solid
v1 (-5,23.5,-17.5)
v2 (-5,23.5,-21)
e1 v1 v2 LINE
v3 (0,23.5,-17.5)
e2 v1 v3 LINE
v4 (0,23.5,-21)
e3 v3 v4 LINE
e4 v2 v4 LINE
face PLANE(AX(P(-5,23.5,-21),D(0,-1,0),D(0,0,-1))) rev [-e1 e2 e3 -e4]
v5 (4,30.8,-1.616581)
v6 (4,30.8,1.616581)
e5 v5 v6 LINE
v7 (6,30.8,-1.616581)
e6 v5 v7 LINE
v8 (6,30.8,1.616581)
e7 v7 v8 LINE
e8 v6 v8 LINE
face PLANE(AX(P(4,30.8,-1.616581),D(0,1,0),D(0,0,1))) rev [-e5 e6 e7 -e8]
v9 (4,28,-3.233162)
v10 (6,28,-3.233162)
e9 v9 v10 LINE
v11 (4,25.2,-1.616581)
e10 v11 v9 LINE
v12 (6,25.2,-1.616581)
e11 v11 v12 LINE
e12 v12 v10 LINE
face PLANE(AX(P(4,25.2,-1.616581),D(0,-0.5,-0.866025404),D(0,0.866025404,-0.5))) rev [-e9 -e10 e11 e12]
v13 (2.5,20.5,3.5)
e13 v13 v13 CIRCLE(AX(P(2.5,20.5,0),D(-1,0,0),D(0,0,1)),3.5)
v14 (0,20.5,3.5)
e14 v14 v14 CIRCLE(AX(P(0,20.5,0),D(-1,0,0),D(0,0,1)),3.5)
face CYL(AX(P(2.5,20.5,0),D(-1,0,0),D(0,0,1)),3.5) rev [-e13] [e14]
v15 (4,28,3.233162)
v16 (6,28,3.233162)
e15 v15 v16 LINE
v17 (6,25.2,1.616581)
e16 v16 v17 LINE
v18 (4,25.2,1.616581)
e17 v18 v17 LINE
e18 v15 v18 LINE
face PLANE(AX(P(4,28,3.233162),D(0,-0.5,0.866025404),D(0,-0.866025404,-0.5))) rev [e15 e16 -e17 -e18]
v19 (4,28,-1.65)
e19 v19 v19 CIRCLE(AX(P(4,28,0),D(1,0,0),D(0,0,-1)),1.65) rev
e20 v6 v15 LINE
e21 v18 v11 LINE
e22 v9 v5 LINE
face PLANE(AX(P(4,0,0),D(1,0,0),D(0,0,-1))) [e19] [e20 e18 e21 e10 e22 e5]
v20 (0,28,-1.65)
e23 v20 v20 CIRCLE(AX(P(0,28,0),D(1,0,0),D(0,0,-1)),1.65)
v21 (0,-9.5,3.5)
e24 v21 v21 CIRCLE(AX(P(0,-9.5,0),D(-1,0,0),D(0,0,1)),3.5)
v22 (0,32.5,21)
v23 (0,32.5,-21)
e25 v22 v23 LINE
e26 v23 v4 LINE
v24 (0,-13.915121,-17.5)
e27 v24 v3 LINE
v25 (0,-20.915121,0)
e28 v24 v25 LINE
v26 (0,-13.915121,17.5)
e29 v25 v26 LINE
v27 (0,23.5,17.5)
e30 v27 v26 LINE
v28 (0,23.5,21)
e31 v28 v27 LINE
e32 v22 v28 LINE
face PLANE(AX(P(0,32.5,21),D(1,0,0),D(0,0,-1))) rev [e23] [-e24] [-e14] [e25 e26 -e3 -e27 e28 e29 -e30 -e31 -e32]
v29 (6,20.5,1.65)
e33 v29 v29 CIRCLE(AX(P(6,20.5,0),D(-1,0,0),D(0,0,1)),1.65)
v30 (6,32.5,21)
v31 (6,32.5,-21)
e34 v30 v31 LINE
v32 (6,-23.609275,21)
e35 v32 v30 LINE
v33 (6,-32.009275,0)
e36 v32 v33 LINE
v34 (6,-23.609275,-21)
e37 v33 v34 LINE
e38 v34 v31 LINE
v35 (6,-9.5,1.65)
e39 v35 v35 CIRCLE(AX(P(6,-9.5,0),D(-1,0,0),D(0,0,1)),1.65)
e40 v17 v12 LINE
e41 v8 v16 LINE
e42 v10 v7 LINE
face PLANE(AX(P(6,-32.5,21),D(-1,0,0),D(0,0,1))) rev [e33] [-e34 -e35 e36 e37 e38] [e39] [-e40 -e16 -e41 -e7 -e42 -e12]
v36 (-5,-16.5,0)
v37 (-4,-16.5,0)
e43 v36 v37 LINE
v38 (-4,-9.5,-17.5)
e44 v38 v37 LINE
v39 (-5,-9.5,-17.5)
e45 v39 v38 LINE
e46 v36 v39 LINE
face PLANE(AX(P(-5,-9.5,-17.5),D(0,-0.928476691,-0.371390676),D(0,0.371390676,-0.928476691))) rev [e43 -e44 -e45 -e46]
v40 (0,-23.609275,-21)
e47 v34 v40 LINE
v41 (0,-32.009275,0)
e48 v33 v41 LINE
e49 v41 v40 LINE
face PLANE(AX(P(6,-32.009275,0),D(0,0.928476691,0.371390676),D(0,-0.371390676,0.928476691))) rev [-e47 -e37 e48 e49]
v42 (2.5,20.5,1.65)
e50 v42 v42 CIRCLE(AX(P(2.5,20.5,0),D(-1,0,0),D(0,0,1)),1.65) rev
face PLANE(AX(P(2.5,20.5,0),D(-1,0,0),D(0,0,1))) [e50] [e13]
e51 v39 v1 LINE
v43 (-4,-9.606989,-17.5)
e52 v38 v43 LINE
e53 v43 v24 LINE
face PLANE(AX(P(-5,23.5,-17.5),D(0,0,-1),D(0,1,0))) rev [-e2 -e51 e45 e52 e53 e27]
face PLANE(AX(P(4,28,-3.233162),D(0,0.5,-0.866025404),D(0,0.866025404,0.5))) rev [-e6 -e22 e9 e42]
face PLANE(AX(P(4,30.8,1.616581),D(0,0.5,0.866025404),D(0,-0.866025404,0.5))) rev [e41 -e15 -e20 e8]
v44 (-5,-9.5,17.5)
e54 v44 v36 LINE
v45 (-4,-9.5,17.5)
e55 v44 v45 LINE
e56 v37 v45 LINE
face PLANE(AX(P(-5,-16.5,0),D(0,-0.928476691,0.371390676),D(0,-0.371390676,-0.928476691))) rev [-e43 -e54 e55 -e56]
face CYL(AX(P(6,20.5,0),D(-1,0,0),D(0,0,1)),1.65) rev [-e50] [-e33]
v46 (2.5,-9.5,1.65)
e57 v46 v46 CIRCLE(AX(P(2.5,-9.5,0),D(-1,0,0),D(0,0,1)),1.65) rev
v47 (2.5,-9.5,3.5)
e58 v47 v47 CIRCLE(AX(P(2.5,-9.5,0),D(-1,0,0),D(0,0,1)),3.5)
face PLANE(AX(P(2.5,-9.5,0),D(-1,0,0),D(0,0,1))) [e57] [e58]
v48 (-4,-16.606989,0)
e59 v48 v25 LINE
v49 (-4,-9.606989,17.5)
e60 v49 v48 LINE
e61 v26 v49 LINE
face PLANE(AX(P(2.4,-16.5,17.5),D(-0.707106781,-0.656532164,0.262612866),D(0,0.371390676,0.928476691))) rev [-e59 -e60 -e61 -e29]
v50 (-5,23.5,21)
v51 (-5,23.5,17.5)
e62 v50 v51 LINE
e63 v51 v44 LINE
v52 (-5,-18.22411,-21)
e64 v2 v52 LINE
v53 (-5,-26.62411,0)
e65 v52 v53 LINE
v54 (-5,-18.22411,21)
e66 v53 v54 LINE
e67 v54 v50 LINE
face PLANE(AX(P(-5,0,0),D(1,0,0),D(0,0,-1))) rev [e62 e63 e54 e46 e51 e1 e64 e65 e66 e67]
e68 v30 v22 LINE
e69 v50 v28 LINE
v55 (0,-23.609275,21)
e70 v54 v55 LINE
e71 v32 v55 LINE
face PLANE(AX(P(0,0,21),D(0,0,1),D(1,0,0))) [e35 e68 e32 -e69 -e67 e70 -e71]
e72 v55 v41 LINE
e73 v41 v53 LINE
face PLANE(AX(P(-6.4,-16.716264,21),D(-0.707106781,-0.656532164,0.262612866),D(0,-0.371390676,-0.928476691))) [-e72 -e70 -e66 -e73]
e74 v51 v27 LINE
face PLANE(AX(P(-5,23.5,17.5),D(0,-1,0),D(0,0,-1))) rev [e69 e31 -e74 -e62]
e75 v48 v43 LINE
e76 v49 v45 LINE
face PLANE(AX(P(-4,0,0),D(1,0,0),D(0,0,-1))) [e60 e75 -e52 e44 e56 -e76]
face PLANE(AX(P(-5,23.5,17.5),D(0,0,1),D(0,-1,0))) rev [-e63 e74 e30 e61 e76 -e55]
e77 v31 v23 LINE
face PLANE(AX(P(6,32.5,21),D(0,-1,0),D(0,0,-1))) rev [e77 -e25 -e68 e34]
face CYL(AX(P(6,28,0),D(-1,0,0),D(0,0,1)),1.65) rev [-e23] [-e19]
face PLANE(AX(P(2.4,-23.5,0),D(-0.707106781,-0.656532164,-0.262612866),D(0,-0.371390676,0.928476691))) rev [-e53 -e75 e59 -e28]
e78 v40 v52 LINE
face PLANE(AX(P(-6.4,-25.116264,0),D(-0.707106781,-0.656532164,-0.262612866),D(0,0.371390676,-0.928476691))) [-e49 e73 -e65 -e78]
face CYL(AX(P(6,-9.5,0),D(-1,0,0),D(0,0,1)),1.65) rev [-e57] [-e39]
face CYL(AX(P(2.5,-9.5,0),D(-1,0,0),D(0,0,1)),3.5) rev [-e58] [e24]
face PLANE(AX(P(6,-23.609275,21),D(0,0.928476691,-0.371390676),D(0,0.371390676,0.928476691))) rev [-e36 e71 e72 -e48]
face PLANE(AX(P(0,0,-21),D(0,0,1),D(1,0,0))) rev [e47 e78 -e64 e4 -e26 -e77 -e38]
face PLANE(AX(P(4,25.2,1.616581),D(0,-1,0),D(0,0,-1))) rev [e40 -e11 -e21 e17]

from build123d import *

# Parameters (mm, degrees)
ESBO_O1_W                = 6
ESBO_O1_H                = 65
RESSALTO_EXTRUS_O1_DEPTH = 21
RESSALTO_EXTRUS_O4_DEPTH = 5
CORTE_EXTRUS_O6_START    = -1
CORTE_EXTRUS_O6_DEPTH    = 4
CHANFRO1_SIZE            = 6.4
CHANFRO2_SIZE            = 6.4
ESBO_O15_R               = 1.65
CORTE_EXTRUS_O7_DEPTH    = 41.227478171
CORTE_EXTRUS_O8_DEPTH    = 2
ESBO_O17_R               = 3.5
CORTE_EXTRUS_O9_DEPTH    = 2.5
CORTE_EXTRUS_O10_DEPTH   = 40.15673633


with BuildPart() as part:
    # Esboço1 → Ressalto-extrusão1 (new, symmetric)
    with BuildSketch(Plane.XY):
        with Locations((3, 0)):
            Rectangle(ESBO_O1_W, ESBO_O1_H)
    extrude(amount=RESSALTO_EXTRUS_O1_DEPTH, both=True)

    # Esboço11 → Ressalto-extrusão4 (add)
    with BuildSketch(Plane.ZY):
        Polygon((-17.5, -9.5), (0, -16.5), (17.5, -9.5), (17.5, 23.5), (21, 23.5), (21, -16.716263691), (0, -25.116263691), (-21, -16.716263691), (-21, 23.5), (-17.5, 23.5), align=None)
    extrude(amount=RESSALTO_EXTRUS_O4_DEPTH)

    # Esboço12 → Corte-extrusão6 (cut)
    with BuildSketch(Plane.ZY.offset(5).offset(CORTE_EXTRUS_O6_START)):
        Polygon((-17.5, -9.5), (17.5, -9.5), (17.5, -16.5), (0, -23.5), (-17.5, -16.5), align=None)
    extrude(amount=-CORTE_EXTRUS_O6_DEPTH, mode=Mode.SUBTRACT)

    # Chanfro1
    # the kernel refuses this chamfer: 6.4 mm, written as the material it adds along each edge
    with BuildSketch(Plane(origin=(-4, -29.612634139, 15.281585348), x_dir=(-0.0274958766105864, 0.9281256495501803, 0.3712502598200724), z_dir=(0, 0.371390676354104, -0.9284766908852593))) as chanfro1_piece_1_section:
        Polygon((CHANFRO1_SIZE * 0.999621916911, CHANFRO1_SIZE * 0.0274958766106), (-CHANFRO1_SIZE * 0.0274958766106, CHANFRO1_SIZE * 0.999621916911), (0, 0), align=None)
    chanfro1_piece_1 = extrude(amount=51.765619071, mode=Mode.PRIVATE)
    chanfro1_piece_1 = split(chanfro1_piece_1, bisect_by=Plane(origin=(-1.981352532, -18.155988855, -17.5), z_dir=(0, 0, 1)), keep=Keep.TOP, mode=Mode.PRIVATE)
    chanfro1_piece_1 = split(chanfro1_piece_1, bisect_by=Plane(origin=(-1.981352532, -25.250248134, -4.375620334), z_dir=(0, 0.9284766908852594, -0.3713906763541037)), keep=Keep.TOP, mode=Mode.PRIVATE)
    add(chanfro1_piece_1)
    with BuildSketch(Plane(origin=(-4, -10.387365861, 32.781585348), x_dir=(-0.027495876610586396, 0.9281256495501804, -0.37125025982007215), z_dir=(0, -0.3713906763541037, -0.9284766908852594))) as chanfro1_piece_2_section:
        Polygon((CHANFRO1_SIZE * 0.999621916911, CHANFRO1_SIZE * 0.0274958766106), (-CHANFRO1_SIZE * 0.0274958766106, CHANFRO1_SIZE * 0.999621916911), (0, 0), align=None)
    chanfro1_piece_2 = extrude(amount=51.765619071, mode=Mode.PRIVATE)
    chanfro1_piece_2 = split(chanfro1_piece_2, bisect_by=Plane(origin=(-1.981352532, -18.155988855, 17.5), z_dir=(0, 0, -1)), keep=Keep.TOP, mode=Mode.PRIVATE)
    chanfro1_piece_2 = split(chanfro1_piece_2, bisect_by=Plane(origin=(-1.981352532, -25.250248134, 4.375620334), z_dir=(0, 0.9284766908852593, 0.371390676354104)), keep=Keep.TOP, mode=Mode.PRIVATE)
    add(chanfro1_piece_2)

    # Chanfro2
    # the kernel refuses this chamfer: 6.4 mm, written as the material it adds along each edge
    with BuildSketch(Plane(origin=(0, -31.228897831, 15.281585348), x_dir=(-0.9996219169112968, 0.025529280528386766, 0.010211712211354711), z_dir=(0, 0.37139067635410383, -0.9284766908852593))) as chanfro2_piece_1_section:
        Polygon((CHANFRO2_SIZE * 0.999621916911, -CHANFRO2_SIZE * 0.0274958766106), (-CHANFRO2_SIZE * 0.0274958766106, -CHANFRO2_SIZE * 0.999621916911), (0, 0), align=None)
    chanfro2_piece_1 = extrude(amount=55.535234436, mode=Mode.PRIVATE)
    chanfro2_piece_1 = split(chanfro2_piece_1, bisect_by=Plane(origin=(-5, -22.562055234, -11.871492952), z_dir=(1, 0, 0)), keep=Keep.TOP, mode=Mode.PRIVATE)
    chanfro2_piece_1 = split(chanfro2_piece_1, bisect_by=Plane(origin=(-1.967131821, -22.562055234, -21), z_dir=(0, 0, 1)), keep=Keep.TOP, mode=Mode.PRIVATE)
    chanfro2_piece_1 = split(chanfro2_piece_1, bisect_by=Plane(origin=(-1.967131821, -28.857577336, -9.353284111), z_dir=(0, 0.9284766908852593, -0.37139067635410383)), keep=Keep.TOP, mode=Mode.PRIVATE)
    add(chanfro2_piece_1)
    with BuildSketch(Plane(origin=(0, -10.603629552, 36.281585348), x_dir=(-0.9996219169112968, 0.02552928052838644, -0.010211712211354581), z_dir=(0, -0.37139067635410383, -0.9284766908852593))) as chanfro2_piece_2_section:
        Polygon((CHANFRO2_SIZE * 0.999621916911, -CHANFRO2_SIZE * 0.0274958766106), (-CHANFRO2_SIZE * 0.0274958766106, -CHANFRO2_SIZE * 0.999621916911), (0, 0), align=None)
    chanfro2_piece_2 = extrude(amount=55.535234436, mode=Mode.PRIVATE)
    chanfro2_piece_2 = split(chanfro2_piece_2, bisect_by=Plane(origin=(-5, -22.562055234, 11.871492952), z_dir=(1, 0, 0)), keep=Keep.TOP, mode=Mode.PRIVATE)
    chanfro2_piece_2 = split(chanfro2_piece_2, bisect_by=Plane(origin=(-1.967131821, -22.562055234, 21), z_dir=(0, 0, -1)), keep=Keep.TOP, mode=Mode.PRIVATE)
    chanfro2_piece_2 = split(chanfro2_piece_2, bisect_by=Plane(origin=(-1.967131821, -28.857577336, 9.353284111), z_dir=(0, 0.9284766908852593, 0.37139067635410383)), keep=Keep.TOP, mode=Mode.PRIVATE)
    add(chanfro2_piece_2)
    with BuildSketch(Plane(origin=(0, -10.603629552, 36.281585348), x_dir=(-0.9996219169112968, 0.02552928052838644, -0.010211712211354581), z_dir=(0, -0.37139067635410383, -0.9284766908852593))) as chanfro2_piece_3a_section:
        Polygon((CHANFRO2_SIZE * 0.999621916911, -CHANFRO2_SIZE * 0.0274958766106), (-CHANFRO2_SIZE * 0.0274958766106, -CHANFRO2_SIZE * 0.999621916911), (0, 0), align=None)
    chanfro2_piece_3a = extrude(amount=55.535234436, mode=Mode.PRIVATE)
    chanfro2_piece_3a = split(chanfro2_piece_3a, bisect_by=Plane(origin=(-5, -29.234460618, -4.706755421), z_dir=(1, 0, 0)), keep=Keep.TOP, mode=Mode.PRIVATE)
    chanfro2_piece_3a = split(chanfro2_piece_3a, bisect_by=Plane(origin=(-1.958615866, -24.061271743, -2.637479871), z_dir=(0, -0.9284766908852593, -0.37139067635410383)), keep=Keep.TOP, mode=Mode.PRIVATE)
    chanfro2_piece_3a = split(chanfro2_piece_3a, bisect_by=Plane(origin=(-1.958615866, -32.5, -4.706755421), z_dir=(0, 1, 0)), keep=Keep.TOP, mode=Mode.PRIVATE)
    with BuildSketch(Plane(origin=(0, -31.228897831, 15.281585348), x_dir=(-0.9996219169112968, 0.025529280528386766, 0.010211712211354711), z_dir=(0, 0.37139067635410383, -0.9284766908852593))) as chanfro2_piece_3b_section:
        Polygon((CHANFRO2_SIZE * 0.999621916911, -CHANFRO2_SIZE * 0.0274958766106), (-CHANFRO2_SIZE * 0.0274958766106, -CHANFRO2_SIZE * 0.999621916911), (0, 0), align=None)
    chanfro2_piece_3b = extrude(amount=55.535234436, mode=Mode.PRIVATE)
    chanfro2_piece_3b = split(chanfro2_piece_3b, bisect_by=Plane(origin=(-5, -29.234460618, 4.706755421), z_dir=(1, 0, 0)), keep=Keep.TOP, mode=Mode.PRIVATE)
    chanfro2_piece_3b = split(chanfro2_piece_3b, bisect_by=Plane(origin=(-1.958615866, -24.061271743, 2.637479871), z_dir=(0, -0.9284766908852593, 0.37139067635410383)), keep=Keep.TOP, mode=Mode.PRIVATE)
    chanfro2_piece_3b = split(chanfro2_piece_3b, bisect_by=Plane(origin=(-1.958615866, -32.5, 4.706755421), z_dir=(0, 1, 0)), keep=Keep.TOP, mode=Mode.PRIVATE)
    chanfro2_piece_3 = chanfro2_piece_3a & chanfro2_piece_3b
    add(chanfro2_piece_3)

    # Esboço15 → Corte-extrusão7 (cut, through all)
    with BuildSketch(Plane.ZY.offset(5)):
        with Locations((0, 28)):
            Circle(ESBO_O15_R)
        with Locations((0, 20.5)):
            Circle(ESBO_O15_R)
        with Locations((0, -9.5)):
            Circle(ESBO_O15_R)
    extrude(amount=-CORTE_EXTRUS_O7_DEPTH, mode=Mode.SUBTRACT)

    # Esboço16 → Corte-extrusão8 (cut)
    with BuildSketch(Plane(origin=(6, 0, 0), x_dir=(0, 0, -1), z_dir=(1, 0, 0))):
        Polygon((3.233161507, 28), (1.616580754, 30.8), (-1.616580754, 30.8), (-3.233161507, 28), (-1.616580754, 25.2), (1.616580754, 25.2), align=None)
    extrude(amount=-CORTE_EXTRUS_O8_DEPTH, mode=Mode.SUBTRACT)

    # Esboço17 → Corte-extrusão9 (cut)
    with BuildSketch(Plane.ZY):
        with Locations((0, 20.5)):
            Circle(ESBO_O17_R)
        with Locations((0, -9.5)):
            Circle(ESBO_O17_R)
    extrude(amount=-CORTE_EXTRUS_O9_DEPTH, mode=Mode.SUBTRACT)

    # Esboço18 → Corte-extrusão10 (cut, through all)
    with BuildSketch(Plane.ZY):
        Polygon((21, -23.609274645), (0, -32.009274645), (-21, -23.609274645), (-21, -32.5), (21, -32.5), align=None)
    extrude(amount=-CORTE_EXTRUS_O10_DEPTH, mode=Mode.SUBTRACT)


solid = part.part
